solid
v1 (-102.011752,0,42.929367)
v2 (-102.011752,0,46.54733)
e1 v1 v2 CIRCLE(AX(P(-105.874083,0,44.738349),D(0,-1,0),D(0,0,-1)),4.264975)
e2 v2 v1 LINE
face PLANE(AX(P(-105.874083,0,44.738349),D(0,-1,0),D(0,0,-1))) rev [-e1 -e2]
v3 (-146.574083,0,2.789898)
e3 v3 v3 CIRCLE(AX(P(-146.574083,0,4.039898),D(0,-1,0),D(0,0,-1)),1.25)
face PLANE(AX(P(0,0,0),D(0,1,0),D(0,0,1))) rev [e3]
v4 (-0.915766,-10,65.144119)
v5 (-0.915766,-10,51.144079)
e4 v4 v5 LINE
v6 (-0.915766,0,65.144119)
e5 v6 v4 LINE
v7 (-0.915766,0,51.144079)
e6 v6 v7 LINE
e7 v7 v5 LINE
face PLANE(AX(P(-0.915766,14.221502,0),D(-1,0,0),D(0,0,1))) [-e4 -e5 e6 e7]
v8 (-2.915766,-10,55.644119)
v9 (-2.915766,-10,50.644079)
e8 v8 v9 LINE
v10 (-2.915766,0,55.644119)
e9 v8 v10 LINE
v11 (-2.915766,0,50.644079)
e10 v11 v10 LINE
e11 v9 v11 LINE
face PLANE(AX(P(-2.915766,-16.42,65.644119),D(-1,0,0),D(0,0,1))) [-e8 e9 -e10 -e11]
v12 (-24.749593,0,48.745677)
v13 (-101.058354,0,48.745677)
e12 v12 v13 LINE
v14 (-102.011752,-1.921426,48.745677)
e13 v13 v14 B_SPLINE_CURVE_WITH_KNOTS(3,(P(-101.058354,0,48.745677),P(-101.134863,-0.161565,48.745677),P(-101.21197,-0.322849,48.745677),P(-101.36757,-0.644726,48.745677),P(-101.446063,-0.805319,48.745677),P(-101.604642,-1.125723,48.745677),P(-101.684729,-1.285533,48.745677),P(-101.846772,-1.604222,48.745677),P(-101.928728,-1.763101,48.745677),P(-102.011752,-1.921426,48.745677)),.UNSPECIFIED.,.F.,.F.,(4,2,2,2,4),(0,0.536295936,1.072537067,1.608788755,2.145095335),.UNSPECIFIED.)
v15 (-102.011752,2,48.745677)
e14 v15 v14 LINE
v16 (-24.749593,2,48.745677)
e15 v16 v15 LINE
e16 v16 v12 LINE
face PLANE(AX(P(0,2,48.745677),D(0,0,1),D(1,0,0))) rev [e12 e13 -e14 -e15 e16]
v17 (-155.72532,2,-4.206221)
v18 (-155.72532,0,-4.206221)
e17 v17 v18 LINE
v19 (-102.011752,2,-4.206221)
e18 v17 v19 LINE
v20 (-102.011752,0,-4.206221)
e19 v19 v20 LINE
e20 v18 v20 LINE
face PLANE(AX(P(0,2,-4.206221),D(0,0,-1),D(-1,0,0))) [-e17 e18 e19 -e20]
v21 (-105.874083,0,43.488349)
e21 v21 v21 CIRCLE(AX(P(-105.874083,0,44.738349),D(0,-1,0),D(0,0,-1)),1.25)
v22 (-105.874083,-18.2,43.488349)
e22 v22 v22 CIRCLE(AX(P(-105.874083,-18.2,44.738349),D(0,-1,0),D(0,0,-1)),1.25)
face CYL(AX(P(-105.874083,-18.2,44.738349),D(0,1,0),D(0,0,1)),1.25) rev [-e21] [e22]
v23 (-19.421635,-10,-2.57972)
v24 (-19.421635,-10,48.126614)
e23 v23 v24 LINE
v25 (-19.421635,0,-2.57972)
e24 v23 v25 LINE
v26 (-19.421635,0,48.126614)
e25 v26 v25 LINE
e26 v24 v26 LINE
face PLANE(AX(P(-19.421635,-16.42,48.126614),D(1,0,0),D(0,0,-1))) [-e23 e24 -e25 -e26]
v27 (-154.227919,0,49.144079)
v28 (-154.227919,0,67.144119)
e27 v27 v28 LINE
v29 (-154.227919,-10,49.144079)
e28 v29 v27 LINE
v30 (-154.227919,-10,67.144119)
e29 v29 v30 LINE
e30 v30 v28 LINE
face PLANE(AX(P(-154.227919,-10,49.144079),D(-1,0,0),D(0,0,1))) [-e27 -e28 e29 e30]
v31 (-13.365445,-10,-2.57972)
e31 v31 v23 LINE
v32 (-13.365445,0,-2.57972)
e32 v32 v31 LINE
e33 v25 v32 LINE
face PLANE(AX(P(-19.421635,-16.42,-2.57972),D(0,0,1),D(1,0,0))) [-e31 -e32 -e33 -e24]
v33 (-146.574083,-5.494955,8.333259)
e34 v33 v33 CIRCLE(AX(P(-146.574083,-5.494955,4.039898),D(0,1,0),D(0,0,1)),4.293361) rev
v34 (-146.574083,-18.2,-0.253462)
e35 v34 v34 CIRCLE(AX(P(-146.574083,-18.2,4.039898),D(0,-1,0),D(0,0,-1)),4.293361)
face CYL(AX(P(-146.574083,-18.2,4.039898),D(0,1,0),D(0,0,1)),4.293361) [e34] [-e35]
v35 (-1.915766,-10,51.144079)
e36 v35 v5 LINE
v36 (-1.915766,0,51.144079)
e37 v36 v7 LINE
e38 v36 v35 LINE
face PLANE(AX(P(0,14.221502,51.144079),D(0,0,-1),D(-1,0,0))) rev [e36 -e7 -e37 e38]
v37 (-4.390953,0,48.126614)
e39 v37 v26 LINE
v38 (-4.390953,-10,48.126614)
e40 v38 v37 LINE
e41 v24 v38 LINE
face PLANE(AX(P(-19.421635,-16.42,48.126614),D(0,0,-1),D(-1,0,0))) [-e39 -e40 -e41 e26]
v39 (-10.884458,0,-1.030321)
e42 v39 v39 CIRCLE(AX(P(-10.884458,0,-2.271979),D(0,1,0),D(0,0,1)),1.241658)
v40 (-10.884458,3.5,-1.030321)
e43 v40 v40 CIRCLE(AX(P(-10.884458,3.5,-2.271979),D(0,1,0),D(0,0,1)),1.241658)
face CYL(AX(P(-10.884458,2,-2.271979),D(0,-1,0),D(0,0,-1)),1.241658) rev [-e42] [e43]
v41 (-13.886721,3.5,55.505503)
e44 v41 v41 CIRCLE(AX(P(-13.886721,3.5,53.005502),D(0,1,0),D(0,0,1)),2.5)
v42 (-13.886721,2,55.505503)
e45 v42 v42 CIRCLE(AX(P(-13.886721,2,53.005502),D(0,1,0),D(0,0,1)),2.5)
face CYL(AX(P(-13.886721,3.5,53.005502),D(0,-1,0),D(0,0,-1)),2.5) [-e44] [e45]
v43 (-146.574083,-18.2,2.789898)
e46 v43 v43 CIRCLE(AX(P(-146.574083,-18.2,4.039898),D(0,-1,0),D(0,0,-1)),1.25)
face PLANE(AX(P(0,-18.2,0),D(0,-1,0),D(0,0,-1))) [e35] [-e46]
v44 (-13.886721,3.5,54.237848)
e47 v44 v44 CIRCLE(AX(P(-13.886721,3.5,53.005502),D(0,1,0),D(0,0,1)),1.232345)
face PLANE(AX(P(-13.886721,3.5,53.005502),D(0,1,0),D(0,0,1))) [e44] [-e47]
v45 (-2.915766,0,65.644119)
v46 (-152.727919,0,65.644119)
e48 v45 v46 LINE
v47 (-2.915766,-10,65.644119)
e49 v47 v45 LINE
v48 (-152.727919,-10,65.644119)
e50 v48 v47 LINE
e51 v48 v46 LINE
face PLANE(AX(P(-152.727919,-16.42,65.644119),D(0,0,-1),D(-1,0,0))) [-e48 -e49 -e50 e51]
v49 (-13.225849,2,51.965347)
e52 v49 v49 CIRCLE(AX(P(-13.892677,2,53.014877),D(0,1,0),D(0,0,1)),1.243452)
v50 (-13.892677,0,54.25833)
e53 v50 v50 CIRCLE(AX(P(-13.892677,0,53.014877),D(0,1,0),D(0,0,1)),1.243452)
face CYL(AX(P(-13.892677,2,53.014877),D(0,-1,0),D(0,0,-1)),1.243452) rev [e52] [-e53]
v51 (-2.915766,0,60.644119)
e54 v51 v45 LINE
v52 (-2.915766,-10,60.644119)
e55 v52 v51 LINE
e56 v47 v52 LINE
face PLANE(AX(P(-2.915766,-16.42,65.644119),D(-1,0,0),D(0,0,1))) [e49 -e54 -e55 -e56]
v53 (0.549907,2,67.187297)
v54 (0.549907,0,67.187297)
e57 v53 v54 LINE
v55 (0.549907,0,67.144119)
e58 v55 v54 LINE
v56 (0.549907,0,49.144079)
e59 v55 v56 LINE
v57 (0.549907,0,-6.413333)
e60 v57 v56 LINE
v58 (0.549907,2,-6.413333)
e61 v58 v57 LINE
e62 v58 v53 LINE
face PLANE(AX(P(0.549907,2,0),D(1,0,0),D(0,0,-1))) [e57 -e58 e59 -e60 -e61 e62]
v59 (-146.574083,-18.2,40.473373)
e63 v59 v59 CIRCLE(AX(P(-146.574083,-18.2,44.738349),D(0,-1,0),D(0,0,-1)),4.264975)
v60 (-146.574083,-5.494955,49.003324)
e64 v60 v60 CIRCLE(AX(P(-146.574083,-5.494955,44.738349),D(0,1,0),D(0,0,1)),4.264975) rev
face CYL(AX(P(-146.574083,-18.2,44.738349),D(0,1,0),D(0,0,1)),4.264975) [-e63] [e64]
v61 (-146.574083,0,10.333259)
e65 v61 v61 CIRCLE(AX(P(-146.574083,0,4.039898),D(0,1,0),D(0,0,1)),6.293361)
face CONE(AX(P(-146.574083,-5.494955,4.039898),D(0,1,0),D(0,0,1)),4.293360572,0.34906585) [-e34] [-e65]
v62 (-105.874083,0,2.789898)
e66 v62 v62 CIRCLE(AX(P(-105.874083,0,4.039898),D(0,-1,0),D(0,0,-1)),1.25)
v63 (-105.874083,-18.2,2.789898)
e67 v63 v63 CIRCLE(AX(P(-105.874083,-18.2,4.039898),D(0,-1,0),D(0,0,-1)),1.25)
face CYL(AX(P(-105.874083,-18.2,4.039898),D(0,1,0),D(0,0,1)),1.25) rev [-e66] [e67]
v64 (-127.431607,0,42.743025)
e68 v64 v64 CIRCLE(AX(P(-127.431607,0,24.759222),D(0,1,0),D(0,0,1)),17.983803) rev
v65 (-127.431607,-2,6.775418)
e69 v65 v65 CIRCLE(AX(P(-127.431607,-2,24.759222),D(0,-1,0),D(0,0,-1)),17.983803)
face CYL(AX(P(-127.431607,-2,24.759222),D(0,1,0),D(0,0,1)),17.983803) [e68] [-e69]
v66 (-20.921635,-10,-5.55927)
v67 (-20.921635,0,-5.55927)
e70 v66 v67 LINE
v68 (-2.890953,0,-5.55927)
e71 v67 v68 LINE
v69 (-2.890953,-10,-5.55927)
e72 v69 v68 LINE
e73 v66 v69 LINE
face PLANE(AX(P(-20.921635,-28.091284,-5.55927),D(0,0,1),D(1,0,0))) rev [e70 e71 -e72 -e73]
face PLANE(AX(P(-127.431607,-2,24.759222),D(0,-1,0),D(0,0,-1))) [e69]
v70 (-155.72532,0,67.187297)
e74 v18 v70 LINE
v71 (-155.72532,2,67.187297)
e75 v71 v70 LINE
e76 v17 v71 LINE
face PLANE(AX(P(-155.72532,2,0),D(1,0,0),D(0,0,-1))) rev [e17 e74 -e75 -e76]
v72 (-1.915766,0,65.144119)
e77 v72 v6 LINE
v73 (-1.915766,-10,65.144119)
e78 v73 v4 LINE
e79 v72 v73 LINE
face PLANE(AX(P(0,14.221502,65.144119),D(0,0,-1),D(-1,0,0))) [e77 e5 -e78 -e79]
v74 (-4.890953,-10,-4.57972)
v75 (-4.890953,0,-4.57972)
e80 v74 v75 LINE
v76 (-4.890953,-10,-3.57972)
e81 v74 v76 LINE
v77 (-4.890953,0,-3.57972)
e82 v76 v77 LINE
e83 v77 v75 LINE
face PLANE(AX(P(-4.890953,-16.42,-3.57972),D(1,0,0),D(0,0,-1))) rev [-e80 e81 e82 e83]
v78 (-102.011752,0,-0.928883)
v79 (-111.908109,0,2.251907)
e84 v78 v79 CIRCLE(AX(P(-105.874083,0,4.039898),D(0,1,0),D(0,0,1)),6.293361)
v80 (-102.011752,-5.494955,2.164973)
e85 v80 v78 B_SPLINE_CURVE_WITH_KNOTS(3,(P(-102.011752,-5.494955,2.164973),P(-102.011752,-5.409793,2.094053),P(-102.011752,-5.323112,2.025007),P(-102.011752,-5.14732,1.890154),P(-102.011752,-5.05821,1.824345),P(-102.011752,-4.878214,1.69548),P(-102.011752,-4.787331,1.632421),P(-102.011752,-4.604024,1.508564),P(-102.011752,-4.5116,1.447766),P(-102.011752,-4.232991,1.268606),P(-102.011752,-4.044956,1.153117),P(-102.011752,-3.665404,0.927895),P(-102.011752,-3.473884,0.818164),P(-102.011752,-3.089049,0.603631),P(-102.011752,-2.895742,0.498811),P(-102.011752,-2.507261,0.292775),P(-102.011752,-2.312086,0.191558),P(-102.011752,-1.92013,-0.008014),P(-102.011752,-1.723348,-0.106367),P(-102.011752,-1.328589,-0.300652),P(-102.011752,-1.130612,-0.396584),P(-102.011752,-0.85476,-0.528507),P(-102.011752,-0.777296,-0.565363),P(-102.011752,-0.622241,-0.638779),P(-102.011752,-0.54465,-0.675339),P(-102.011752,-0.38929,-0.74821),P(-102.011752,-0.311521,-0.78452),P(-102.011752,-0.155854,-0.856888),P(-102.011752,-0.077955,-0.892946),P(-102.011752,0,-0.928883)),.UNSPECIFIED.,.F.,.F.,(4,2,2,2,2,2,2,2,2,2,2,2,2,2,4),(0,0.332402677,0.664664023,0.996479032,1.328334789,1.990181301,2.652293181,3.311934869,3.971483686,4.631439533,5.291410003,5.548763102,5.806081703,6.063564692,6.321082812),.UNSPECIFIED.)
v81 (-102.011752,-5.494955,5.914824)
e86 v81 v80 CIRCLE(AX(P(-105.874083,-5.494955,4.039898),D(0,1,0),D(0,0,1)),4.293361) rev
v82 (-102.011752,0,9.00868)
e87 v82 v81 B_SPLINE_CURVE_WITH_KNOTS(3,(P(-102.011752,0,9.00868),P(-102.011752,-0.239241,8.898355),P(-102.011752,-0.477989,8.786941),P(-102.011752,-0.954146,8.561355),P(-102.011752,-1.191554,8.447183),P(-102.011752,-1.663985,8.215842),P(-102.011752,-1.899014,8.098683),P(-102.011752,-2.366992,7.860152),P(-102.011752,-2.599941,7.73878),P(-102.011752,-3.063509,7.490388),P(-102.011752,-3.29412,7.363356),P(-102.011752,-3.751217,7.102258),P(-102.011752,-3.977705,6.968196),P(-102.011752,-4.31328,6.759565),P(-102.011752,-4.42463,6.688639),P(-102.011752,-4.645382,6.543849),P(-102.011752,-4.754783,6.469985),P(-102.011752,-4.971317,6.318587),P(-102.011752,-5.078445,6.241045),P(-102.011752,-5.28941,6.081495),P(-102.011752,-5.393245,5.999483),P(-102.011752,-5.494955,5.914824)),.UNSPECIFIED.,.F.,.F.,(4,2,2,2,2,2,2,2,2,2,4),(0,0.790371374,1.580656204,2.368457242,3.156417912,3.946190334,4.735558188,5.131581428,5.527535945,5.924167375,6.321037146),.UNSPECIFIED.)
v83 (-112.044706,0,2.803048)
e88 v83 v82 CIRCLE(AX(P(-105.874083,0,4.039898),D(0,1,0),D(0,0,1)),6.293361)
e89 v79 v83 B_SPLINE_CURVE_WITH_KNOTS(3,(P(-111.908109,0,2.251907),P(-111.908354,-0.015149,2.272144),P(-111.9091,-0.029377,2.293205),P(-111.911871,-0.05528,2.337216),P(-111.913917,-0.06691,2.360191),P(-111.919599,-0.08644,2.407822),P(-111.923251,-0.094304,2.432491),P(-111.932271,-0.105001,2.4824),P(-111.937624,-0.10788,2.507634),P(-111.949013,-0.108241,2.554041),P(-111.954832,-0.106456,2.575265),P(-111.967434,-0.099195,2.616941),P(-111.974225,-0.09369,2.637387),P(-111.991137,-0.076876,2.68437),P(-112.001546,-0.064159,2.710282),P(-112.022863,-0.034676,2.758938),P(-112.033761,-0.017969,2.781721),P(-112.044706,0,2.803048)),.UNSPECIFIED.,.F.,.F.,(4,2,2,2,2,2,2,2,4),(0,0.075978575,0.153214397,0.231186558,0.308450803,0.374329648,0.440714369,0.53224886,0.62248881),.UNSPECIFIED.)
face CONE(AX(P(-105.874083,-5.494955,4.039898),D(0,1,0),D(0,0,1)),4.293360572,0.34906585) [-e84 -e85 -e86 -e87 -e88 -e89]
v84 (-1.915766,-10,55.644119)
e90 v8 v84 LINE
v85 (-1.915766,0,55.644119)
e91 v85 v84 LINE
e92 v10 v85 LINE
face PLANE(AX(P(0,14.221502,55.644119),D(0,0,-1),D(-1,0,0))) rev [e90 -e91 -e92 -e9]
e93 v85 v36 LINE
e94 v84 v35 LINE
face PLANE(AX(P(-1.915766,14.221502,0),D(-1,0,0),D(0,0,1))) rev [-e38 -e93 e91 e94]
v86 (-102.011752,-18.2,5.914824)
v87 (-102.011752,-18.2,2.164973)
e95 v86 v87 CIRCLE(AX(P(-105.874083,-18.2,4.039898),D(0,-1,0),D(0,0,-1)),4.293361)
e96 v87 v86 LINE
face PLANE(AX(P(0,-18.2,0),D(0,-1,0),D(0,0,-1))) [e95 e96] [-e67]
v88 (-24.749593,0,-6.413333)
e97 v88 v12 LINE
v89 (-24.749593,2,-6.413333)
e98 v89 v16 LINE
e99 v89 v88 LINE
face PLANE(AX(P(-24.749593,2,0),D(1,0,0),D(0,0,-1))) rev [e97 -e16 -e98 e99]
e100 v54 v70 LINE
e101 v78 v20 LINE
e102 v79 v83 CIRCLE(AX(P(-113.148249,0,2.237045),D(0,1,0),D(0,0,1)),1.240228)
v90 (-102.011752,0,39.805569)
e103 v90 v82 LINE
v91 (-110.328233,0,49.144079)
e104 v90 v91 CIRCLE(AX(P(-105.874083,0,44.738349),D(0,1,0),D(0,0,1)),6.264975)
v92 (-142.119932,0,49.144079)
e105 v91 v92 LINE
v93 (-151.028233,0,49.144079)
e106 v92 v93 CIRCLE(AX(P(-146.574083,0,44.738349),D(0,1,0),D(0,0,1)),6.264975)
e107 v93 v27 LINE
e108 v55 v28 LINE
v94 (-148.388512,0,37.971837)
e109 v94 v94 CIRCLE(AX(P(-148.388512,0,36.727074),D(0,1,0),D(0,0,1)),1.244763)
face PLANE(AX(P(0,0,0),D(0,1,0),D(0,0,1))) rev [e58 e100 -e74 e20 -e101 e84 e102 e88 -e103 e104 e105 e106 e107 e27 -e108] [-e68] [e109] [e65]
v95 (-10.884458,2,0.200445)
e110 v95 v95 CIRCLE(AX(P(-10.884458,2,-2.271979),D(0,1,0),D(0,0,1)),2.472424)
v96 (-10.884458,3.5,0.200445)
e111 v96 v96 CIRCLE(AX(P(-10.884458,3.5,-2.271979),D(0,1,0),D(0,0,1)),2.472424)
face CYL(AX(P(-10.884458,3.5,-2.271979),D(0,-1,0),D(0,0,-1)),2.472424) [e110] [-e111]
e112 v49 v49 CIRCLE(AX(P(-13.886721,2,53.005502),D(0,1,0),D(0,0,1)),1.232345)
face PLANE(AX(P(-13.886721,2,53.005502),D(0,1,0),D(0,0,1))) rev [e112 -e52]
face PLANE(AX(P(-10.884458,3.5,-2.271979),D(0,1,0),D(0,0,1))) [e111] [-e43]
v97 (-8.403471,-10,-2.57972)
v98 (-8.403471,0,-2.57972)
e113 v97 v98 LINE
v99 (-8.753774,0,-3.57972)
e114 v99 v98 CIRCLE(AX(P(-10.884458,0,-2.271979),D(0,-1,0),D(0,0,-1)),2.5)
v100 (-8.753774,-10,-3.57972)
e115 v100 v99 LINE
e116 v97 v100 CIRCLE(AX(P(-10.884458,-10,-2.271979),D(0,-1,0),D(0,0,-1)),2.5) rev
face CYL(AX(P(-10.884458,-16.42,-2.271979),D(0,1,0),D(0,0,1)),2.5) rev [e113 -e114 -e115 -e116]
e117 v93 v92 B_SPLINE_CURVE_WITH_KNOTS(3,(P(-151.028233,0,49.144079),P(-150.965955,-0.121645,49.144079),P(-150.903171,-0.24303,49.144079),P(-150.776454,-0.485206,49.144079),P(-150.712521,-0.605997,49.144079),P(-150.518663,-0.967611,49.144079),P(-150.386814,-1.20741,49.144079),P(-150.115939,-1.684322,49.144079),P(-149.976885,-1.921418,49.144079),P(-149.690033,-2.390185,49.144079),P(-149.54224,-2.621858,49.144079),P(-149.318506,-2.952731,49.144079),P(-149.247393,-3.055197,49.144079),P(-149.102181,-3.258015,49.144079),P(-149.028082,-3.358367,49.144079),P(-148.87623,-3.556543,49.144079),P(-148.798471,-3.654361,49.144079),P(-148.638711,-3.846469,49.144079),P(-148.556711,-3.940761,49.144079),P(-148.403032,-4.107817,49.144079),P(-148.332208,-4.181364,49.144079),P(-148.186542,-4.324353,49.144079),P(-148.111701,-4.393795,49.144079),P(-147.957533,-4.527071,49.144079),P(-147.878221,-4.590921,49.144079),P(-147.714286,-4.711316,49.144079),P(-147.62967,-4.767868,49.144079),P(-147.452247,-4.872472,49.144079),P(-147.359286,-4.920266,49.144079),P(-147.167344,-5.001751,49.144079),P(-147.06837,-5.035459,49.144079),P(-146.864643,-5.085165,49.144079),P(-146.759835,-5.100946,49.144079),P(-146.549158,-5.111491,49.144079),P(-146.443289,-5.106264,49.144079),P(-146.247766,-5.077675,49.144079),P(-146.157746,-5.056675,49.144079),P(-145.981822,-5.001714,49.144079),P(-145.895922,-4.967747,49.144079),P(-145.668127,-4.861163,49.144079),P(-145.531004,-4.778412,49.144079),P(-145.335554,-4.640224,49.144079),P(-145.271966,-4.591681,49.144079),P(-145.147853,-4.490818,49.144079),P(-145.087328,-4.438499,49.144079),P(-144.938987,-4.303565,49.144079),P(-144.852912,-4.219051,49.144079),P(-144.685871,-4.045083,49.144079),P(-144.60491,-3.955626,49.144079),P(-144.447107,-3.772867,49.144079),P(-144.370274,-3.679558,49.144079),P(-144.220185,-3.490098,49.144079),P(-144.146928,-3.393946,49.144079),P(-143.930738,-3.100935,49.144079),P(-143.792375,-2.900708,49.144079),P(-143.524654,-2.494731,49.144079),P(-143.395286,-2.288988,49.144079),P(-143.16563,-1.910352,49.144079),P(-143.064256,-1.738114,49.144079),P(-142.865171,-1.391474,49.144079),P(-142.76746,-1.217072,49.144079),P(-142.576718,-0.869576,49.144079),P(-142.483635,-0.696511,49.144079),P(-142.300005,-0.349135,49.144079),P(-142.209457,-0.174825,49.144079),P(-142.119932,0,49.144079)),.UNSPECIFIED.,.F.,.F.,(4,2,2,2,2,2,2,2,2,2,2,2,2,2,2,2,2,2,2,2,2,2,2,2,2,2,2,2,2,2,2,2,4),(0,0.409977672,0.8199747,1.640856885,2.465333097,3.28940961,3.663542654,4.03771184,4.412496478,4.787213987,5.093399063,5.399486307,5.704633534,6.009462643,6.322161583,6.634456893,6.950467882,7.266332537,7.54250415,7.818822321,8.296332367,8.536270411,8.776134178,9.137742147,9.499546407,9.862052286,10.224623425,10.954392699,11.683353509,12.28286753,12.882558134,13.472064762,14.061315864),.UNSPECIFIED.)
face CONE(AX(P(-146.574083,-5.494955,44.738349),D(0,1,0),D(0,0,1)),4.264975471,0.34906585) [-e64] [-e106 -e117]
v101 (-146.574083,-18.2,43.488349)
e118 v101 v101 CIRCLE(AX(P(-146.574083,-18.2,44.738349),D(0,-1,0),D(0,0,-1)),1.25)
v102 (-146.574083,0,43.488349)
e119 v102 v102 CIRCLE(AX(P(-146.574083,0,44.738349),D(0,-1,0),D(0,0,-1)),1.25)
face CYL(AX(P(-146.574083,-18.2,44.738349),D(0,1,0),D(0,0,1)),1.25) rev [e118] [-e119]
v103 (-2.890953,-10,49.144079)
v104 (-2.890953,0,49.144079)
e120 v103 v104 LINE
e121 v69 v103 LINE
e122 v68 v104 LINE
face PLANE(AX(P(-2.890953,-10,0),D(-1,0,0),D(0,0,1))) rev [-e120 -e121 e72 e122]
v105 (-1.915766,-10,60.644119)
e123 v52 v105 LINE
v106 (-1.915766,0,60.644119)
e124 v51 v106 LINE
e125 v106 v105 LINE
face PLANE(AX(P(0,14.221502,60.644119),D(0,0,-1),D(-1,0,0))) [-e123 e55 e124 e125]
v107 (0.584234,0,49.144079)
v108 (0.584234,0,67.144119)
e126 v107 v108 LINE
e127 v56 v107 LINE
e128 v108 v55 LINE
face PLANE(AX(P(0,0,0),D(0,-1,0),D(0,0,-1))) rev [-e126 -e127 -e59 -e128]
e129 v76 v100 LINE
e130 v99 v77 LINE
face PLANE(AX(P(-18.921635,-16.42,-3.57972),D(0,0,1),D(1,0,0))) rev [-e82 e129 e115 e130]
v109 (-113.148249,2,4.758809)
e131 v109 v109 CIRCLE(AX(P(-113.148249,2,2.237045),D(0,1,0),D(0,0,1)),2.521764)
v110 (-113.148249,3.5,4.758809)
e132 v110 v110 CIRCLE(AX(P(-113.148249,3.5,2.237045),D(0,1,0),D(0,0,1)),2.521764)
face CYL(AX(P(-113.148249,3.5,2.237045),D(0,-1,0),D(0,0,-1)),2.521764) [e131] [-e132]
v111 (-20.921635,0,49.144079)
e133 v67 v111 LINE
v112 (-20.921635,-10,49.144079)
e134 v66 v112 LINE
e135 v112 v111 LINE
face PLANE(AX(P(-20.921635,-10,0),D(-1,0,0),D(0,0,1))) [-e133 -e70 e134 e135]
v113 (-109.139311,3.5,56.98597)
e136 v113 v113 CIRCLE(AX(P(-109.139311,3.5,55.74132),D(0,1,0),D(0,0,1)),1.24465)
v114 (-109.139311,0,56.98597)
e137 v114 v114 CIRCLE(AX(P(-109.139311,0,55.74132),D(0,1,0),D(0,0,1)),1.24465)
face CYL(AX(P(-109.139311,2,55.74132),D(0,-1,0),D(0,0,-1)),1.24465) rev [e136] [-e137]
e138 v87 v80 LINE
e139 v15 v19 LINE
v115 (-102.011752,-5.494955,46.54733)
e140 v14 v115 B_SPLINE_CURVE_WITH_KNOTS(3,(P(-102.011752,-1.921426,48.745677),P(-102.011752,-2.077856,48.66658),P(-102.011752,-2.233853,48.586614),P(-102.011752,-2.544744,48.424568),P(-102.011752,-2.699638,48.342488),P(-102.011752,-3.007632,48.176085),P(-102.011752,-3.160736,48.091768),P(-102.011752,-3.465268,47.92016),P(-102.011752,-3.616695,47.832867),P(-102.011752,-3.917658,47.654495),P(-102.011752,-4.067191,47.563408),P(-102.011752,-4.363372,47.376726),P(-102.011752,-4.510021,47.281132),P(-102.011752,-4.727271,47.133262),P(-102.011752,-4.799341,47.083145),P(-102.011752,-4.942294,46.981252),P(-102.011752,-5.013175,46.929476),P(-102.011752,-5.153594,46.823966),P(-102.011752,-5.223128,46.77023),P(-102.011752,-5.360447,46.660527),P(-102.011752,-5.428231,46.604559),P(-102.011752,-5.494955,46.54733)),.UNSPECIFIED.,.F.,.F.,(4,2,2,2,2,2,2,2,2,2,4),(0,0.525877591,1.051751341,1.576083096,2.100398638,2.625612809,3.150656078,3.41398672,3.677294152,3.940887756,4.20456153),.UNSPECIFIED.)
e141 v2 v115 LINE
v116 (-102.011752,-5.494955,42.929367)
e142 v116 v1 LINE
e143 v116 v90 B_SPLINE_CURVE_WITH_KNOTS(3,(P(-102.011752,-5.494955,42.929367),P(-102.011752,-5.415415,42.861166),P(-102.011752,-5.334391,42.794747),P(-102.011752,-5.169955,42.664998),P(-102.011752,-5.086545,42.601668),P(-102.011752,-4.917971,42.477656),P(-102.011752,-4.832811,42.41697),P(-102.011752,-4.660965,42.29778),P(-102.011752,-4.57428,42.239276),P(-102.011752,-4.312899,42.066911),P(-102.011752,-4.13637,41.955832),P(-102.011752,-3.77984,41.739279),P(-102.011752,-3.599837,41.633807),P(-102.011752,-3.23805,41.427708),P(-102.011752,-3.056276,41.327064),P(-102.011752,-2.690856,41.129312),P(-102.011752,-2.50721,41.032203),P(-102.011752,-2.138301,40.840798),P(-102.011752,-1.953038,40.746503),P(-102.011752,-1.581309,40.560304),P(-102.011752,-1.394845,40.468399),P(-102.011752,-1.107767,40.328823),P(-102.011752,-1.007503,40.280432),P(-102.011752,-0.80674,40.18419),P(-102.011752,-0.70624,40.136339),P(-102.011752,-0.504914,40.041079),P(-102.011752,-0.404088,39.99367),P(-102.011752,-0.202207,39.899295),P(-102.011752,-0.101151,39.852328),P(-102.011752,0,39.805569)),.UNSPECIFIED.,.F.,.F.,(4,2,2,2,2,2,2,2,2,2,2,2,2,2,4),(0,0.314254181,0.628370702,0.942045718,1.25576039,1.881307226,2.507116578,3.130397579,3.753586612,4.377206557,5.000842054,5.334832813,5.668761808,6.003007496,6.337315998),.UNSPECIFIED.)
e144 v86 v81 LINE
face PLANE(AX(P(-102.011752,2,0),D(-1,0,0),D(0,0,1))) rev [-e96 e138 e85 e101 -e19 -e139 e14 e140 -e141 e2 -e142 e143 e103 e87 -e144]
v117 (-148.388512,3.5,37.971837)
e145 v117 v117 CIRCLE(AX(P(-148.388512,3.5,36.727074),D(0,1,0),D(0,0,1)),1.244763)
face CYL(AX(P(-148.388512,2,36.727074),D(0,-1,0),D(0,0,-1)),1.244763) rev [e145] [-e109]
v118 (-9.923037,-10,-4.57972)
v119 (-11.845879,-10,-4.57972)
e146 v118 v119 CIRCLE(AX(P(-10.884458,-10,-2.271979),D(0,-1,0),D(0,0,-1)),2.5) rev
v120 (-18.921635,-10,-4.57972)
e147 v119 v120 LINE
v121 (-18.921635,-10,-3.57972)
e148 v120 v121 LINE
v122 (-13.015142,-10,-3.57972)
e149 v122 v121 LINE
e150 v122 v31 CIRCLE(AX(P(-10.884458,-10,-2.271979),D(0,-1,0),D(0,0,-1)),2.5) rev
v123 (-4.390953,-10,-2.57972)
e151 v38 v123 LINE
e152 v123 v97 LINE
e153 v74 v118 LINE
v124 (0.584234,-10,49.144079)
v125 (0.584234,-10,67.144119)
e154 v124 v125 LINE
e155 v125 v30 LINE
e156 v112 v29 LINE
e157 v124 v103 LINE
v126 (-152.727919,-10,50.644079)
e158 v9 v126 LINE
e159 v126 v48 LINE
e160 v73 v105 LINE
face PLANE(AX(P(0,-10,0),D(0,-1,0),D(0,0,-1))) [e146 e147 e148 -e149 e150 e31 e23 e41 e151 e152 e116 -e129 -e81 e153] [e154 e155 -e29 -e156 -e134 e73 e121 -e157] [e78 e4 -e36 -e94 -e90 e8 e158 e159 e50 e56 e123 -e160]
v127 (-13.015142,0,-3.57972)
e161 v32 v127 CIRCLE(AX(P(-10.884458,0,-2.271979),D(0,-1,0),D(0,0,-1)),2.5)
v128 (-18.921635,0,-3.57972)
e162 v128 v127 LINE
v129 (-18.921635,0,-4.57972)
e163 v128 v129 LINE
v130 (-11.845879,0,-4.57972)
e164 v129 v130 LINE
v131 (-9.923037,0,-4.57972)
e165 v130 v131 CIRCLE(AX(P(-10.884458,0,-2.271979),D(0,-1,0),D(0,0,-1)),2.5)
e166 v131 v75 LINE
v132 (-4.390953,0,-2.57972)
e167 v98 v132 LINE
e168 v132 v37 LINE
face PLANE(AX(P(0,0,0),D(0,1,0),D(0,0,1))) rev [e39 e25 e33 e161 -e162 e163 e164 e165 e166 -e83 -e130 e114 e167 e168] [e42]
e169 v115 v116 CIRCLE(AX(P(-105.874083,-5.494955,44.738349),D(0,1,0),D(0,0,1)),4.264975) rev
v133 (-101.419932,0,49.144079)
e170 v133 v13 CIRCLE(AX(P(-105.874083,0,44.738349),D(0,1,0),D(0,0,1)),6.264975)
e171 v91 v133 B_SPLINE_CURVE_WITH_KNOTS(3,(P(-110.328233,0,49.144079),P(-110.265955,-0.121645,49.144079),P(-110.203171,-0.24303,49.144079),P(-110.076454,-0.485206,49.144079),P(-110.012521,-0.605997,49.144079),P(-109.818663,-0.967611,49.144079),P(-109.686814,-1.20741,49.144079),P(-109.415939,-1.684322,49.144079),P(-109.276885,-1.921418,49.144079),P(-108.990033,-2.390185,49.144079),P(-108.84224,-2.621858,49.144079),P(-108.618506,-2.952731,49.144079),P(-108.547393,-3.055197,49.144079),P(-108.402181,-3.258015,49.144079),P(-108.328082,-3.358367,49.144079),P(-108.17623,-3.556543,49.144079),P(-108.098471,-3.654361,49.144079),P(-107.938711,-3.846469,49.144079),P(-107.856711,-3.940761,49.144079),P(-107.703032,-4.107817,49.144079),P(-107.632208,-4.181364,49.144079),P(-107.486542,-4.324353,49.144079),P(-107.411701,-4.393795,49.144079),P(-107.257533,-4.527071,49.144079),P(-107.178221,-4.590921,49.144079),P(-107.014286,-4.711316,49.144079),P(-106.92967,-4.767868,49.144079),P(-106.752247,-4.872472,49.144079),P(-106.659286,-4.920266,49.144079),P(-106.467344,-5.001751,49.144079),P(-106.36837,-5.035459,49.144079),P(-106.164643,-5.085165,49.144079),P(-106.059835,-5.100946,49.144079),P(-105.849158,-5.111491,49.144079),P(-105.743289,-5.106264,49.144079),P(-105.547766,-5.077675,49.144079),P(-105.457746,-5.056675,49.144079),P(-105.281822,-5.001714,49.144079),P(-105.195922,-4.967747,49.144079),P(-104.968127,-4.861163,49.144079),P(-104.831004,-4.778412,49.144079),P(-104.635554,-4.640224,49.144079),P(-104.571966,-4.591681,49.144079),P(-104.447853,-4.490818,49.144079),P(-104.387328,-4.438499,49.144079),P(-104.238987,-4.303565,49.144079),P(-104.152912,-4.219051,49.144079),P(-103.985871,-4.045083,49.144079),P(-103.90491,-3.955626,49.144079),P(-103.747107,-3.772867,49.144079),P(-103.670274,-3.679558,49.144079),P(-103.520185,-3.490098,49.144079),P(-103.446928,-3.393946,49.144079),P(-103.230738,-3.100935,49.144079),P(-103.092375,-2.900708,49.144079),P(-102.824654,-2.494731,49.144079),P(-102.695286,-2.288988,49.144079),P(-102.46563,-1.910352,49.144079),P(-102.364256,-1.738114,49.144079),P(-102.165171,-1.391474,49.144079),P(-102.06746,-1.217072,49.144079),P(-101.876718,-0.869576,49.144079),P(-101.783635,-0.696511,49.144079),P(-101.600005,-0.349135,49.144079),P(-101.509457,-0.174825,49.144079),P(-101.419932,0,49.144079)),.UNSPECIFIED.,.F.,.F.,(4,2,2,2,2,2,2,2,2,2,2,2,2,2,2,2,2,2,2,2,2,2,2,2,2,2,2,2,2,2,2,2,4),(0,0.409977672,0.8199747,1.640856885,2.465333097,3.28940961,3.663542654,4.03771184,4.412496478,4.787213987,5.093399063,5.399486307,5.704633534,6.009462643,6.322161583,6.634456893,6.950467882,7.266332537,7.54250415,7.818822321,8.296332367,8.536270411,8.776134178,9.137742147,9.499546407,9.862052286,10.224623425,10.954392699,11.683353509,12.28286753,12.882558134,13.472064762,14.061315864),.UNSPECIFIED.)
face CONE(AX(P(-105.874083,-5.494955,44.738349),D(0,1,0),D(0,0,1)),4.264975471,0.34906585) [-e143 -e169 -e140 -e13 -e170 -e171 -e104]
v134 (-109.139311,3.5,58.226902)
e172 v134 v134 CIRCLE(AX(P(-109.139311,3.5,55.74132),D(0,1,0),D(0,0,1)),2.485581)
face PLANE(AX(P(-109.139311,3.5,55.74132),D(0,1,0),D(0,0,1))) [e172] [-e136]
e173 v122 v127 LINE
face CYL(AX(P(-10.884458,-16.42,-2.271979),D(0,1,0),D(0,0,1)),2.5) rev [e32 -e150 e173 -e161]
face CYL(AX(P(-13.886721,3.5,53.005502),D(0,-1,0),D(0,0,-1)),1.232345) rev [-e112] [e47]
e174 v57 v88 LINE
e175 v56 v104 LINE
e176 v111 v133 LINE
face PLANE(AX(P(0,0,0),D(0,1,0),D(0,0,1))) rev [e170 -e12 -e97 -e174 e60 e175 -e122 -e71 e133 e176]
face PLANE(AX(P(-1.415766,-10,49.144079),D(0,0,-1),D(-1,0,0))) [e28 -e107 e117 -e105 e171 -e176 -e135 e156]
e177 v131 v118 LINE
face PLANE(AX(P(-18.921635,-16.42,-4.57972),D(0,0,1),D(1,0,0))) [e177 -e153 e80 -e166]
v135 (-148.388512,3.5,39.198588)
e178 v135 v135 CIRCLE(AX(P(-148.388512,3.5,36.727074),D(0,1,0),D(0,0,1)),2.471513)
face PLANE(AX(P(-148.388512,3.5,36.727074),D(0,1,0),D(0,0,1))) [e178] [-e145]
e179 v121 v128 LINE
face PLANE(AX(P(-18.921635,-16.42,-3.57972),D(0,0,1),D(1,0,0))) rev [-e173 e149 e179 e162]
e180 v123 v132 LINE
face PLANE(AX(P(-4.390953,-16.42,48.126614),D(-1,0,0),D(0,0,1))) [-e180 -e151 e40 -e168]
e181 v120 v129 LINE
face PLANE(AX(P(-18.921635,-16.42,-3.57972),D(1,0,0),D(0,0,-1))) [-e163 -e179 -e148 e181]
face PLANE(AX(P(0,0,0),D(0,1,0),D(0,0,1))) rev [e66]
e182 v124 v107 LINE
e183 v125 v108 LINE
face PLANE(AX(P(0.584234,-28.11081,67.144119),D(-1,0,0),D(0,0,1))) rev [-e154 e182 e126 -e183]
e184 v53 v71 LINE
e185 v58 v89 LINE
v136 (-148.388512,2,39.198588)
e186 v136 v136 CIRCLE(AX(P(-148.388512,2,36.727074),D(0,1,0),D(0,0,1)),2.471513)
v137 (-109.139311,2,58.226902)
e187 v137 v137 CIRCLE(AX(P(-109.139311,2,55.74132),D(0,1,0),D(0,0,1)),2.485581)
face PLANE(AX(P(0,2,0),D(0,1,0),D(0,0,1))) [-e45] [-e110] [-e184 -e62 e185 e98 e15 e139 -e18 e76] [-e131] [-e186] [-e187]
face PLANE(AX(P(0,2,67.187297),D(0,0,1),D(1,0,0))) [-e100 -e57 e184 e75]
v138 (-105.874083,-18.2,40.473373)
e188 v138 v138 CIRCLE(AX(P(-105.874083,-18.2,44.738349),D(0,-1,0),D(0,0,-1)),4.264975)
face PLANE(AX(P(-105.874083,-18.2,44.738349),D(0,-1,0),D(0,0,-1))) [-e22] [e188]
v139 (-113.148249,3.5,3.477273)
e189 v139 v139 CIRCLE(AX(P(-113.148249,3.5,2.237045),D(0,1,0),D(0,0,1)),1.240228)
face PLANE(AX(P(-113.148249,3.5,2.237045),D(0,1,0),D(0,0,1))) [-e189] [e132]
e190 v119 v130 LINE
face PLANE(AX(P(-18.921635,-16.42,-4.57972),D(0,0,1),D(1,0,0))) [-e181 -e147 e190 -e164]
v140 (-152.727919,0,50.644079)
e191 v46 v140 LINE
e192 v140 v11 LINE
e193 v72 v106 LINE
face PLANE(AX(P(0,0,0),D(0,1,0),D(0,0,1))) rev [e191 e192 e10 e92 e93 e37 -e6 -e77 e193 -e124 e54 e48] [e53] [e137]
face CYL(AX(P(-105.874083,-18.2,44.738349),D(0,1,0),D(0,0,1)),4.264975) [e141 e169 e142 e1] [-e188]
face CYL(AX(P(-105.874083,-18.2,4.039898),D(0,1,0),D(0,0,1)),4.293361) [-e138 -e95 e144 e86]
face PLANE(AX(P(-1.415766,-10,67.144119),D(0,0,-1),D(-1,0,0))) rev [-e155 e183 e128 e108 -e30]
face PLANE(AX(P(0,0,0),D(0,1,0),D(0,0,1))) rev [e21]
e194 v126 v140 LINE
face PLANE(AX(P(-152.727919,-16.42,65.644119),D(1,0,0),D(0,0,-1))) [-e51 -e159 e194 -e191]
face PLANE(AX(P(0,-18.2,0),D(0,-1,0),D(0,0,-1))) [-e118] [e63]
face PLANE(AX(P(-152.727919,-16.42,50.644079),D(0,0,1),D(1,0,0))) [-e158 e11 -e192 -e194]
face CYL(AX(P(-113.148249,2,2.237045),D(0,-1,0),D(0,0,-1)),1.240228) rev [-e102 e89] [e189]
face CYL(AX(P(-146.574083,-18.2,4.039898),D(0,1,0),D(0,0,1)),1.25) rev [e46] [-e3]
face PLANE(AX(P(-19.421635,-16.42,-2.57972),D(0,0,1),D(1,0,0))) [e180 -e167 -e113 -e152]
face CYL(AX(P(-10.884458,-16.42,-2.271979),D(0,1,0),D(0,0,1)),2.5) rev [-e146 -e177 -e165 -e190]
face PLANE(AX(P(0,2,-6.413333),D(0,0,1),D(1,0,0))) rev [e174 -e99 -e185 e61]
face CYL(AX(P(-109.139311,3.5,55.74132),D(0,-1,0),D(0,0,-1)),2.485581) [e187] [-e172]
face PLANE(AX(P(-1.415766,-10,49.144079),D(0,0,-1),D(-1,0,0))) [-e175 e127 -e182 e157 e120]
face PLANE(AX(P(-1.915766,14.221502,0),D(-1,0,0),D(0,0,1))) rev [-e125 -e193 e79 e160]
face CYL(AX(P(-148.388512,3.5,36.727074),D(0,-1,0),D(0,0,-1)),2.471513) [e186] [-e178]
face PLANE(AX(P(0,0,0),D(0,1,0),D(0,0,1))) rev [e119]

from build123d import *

# Parameters (mm, degrees)
SKETCH1_W                 = 25.299499494
SKETCH1_H                 = 55.159009877
SKETCH1_R                 = 1.241657959
SKETCH1_R_2               = 1.244649804
SKETCH1_R_3               = 1.243452392
SKETCH1_W_2               = 53.713568487
SKETCH1_H_2               = 52.951897156
SKETCH1_R_4               = 1.244762628
SKETCH1_R_5               = 1.240228495
BOSS_EXTRUDE1_DEPTH       = 2
SKETCH2_R                 = 2.521764251
SKETCH2_R_2               = 1.240228495
SKETCH2_R_3               = 2.471513498
SKETCH2_R_4               = 1.244762628
SKETCH2_R_5               = 2.485581318
SKETCH2_R_6               = 1.244649804
SKETCH2_R_7               = 2.50000008
SKETCH2_R_8               = 1.232345201
SKETCH2_R_9               = 2.472424153
SKETCH2_R_10              = 1.241657959
BOSS_EXTRUDE2_DEPTH       = 1.5
BOSS_EXTRUDE3_OUTLINE_R   = 4.264975471
BOSS_EXTRUDE3_OUTLINE_R_2 = 1.25
BOSS_EXTRUDE3_OUTLINE_R_3 = 4.293360572
BOSS_EXTRUDE3_DEPTH       = 18.2
BOSS_EXTRUDE4_OUTLINE_W   = 148.81215391
BOSS_EXTRUDE4_OUTLINE_H   = 14.000040224
BOSS_EXTRUDE4_DEPTH       = 10
SKETCH7_W                 = 18.030681689
SKETCH7_H                 = 1.47954917
BOSS_EXTRUDE5_DEPTH       = 10
SKETCH8_R                 = 2.5
SKETCH8_W                 = 14.030681689
SKETCH8_H                 = 1
CUT_EXTRUDE1_DEPTH        = 16.42
SKETCH9_W                 = 2
SKETCH9_H                 = 18.000040224
BOSS_EXTRUDE6_DEPTH       = 10
SKETCH10_W                = 1
SKETCH10_H                = 14.000040224
SKETCH10_W_2              = 1.5
SKETCH10_H_2              = 5
CUT_EXTRUDE2_DEPTH        = 10
CHAMFER1_SIZE             = 2
CHAMFER1_SIZE_2           = 5.494954839
SKETCH12_W                = 15.030681689
SKETCH12_H                = 50.706334577
SKETCH12_W_2              = 14.030681689
SKETCH12_H_2              = 49.706334577
SKETCH12_W_3              = 149.81215391
SKETCH12_H_3              = 15.000040224
SKETCH12_W_4              = 148.81215391
SKETCH12_H_4              = 14.000040224
CUT_EXTRUDE3_DEPTH        = 16.42
SKETCH13_R                = 17.983803221
BOSS_EXTRUDE7_DEPTH       = 2


# Read off the part's stored shape, not the designer's step: Boss-Extrude3, Boss-Extrude4
with BuildPart() as part:
    # Sketch1 → Boss-Extrude1 (new body)
    # profile 1 of 3: a face of its own
    with BuildSketch(Plane(origin=(0, 0, 0), x_dir=(1, 0, 0), z_dir=(0, 1, 0))):
        with Locations((-12.099843009, -21.166171701)):
            Rectangle(SKETCH1_W, SKETCH1_H)
        with Locations(Location((-10.884458073, 2.271979315, 0), (0, 0, 270))):
            Circle(SKETCH1_R, mode=Mode.SUBTRACT)
    # profile 2 of 3: a face of its own
    with BuildSketch(Plane(origin=(0, 0, 0), x_dir=(1, 0, 0), z_dir=(0, 1, 0))):
        Polygon((0.549906738, -67.187297417), (0.549906738, -48.745676639), (-24.749592756, -48.745676639), (-102.011751733, -48.745676639), (-155.72532022, -48.745676639), (-155.72532022, -67.187297417), align=None)
        with Locations(Location((-109.139310681, -55.741320352, 0), (0, 0, 270))):
            Circle(SKETCH1_R_2, mode=Mode.SUBTRACT)
        with Locations(Location((-13.892677204, -53.014877456, 0), (0, 0, 270))):
            Circle(SKETCH1_R_3, mode=Mode.SUBTRACT)
    # profile 3 of 3: a face of its own
    with BuildSketch(Plane(origin=(0, 0, 0), x_dir=(1, 0, 0), z_dir=(0, 1, 0))):
        with Locations((-128.868535977, -22.269728061)):
            Rectangle(SKETCH1_W_2, SKETCH1_H_2)
        with Locations(Location((-148.388511799, -36.727074265, 0), (0, 0, 270))):
            Circle(SKETCH1_R_4, mode=Mode.SUBTRACT)
        with Locations(Location((-113.148248588, -2.237044718, 0), (0, 0, 270))):
            Circle(SKETCH1_R_5, mode=Mode.SUBTRACT)
    extrude(amount=BOSS_EXTRUDE1_DEPTH)

    # Sketch2 → Boss-Extrude2 (add)
    # profile 1 of 5: a face of its own
    with BuildSketch(Plane(origin=(0, 2, 0), x_dir=(1, 0, 0), z_dir=(0, 1, 0))):
        with Locations(Location((-113.148248588, -2.237044718, 0), (0, 0, 270))):
            Circle(SKETCH2_R)
        with Locations(Location((-113.148248588, -2.237044718, 0), (0, 0, 270))):
            Circle(SKETCH2_R_2, mode=Mode.SUBTRACT)
    # profile 2 of 5: a face of its own
    with BuildSketch(Plane(origin=(0, 2, 0), x_dir=(1, 0, 0), z_dir=(0, 1, 0))):
        with Locations(Location((-148.388511799, -36.727074265, 0), (0, 0, 270))):
            Circle(SKETCH2_R_3)
        with Locations(Location((-148.388511799, -36.727074265, 0), (0, 0, 270))):
            Circle(SKETCH2_R_4, mode=Mode.SUBTRACT)
    # profile 3 of 5: a face of its own
    with BuildSketch(Plane(origin=(0, 2, 0), x_dir=(1, 0, 0), z_dir=(0, 1, 0))):
        with Locations(Location((-109.139310681, -55.741320352, 0), (0, 0, 270))):
            Circle(SKETCH2_R_5)
        with Locations(Location((-109.139310681, -55.741320352, 0), (0, 0, 270))):
            Circle(SKETCH2_R_6, mode=Mode.SUBTRACT)
    # profile 4 of 5: a face of its own
    with BuildSketch(Plane(origin=(0, 2, 0), x_dir=(1, 0, 0), z_dir=(0, 1, 0))):
        with Locations(Location((-13.886720738, -53.00550248, 0), (0, 0, 270))):
            Circle(SKETCH2_R_7)
        with Locations(Location((-13.886720738, -53.00550248, 0), (0, 0, 57.569834669))):
            Circle(SKETCH2_R_8, mode=Mode.SUBTRACT)
    # profile 5 of 5: a face of its own
    with BuildSketch(Plane(origin=(0, 2, 0), x_dir=(1, 0, 0), z_dir=(0, 1, 0))):
        with Locations(Location((-10.884458073, 2.271979315, 0), (0, 0, 270))):
            Circle(SKETCH2_R_9)
        with Locations(Location((-10.884458073, 2.271979315, 0), (0, 0, 270))):
            Circle(SKETCH2_R_10, mode=Mode.SUBTRACT)
    extrude(amount=BOSS_EXTRUDE2_DEPTH)

    # Boss-Extrude3 outline → Boss-Extrude3 (add)
    # profile 1 of 4: a face of its own
    with BuildSketch(Plane.XZ):
        with Locations((-105.874082677, 44.738348581)):
            Circle(BOSS_EXTRUDE3_OUTLINE_R)
        with Locations((-105.874082677, 44.738348581)):
            Circle(BOSS_EXTRUDE3_OUTLINE_R_2, mode=Mode.SUBTRACT)
    # profile 2 of 4: a face of its own
    with BuildSketch(Plane.XZ):
        with BuildLine():
            ThreePointArc((-102.011751733, 5.914823562), (-110.167443249, 4.039898313), (-102.011751733, 2.164973064))
            Line((-102.011751733, 2.164973064), (-102.011751733, 5.914823562))
        make_face()
        with Locations((-105.874082677, 4.039898313)):
            Circle(BOSS_EXTRUDE3_OUTLINE_R_2, mode=Mode.SUBTRACT)
    # profile 3 of 4: a face of its own
    with BuildSketch(Plane.XZ):
        with Locations((-146.574082677, 4.039898313)):
            Circle(BOSS_EXTRUDE3_OUTLINE_R_3)
        with Locations((-146.574082677, 4.039898313)):
            Circle(BOSS_EXTRUDE3_OUTLINE_R_2, mode=Mode.SUBTRACT)
    # profile 4 of 4: a face of its own
    with BuildSketch(Plane.XZ):
        with Locations((-146.574082677, 44.738348581)):
            Circle(BOSS_EXTRUDE3_OUTLINE_R)
        with Locations((-146.574082677, 44.738348581)):
            Circle(BOSS_EXTRUDE3_OUTLINE_R_2, mode=Mode.SUBTRACT)
    extrude(amount=BOSS_EXTRUDE3_DEPTH)

    # Boss-Extrude4 outline → Boss-Extrude4 (add)
    with BuildSketch(Plane.XZ):
        Polygon((-2.890953027, -4.07972047), (-2.890953027, 49.144078772), (-1.415765517, 49.144078772), (-1.415765517, 67.144118996), (-154.227919427, 67.144118996), (-154.227919427, 49.144078772), (-20.921634716, 49.144078772), (-20.921634716, -4.07972047), align=None)
        with BuildLine():
            ThreePointArc((-9.657775138, -2.07972047), (-10.884458073, -3.513637274), (-12.111141008, -2.07972047))
            Line((-12.111141008, -2.07972047), (-18.921634716, -2.07972047))
            Line((-18.921634716, -2.07972047), (-18.921634716, 47.626614107))
            Line((-18.921634716, 47.626614107), (-4.890953027, 47.626614107))
            Line((-4.890953027, 47.626614107), (-4.890953027, -2.07972047))
            Line((-4.890953027, -2.07972047), (-9.657775138, -2.07972047))
        make_face(mode=Mode.SUBTRACT)
        with Locations((-77.821842472, 58.144098884)):
            Rectangle(BOSS_EXTRUDE4_OUTLINE_W, BOSS_EXTRUDE4_OUTLINE_H, mode=Mode.SUBTRACT)
    extrude(amount=BOSS_EXTRUDE4_DEPTH)

    # Sketch7 → Boss-Extrude5 (add)
    with BuildSketch(Plane.XZ):
        with Locations((-11.906293872, -4.819495055)):
            Rectangle(SKETCH7_W, SKETCH7_H)
    extrude(amount=BOSS_EXTRUDE5_DEPTH)

    # Sketch8 → Cut-Extrude1 (cut)
    with BuildSketch(Plane.XZ):
        with Locations((-10.884458073, -2.271979315)):
            Circle(SKETCH8_R)
        with Locations((-11.906293872, -4.07972047)):
            Rectangle(SKETCH8_W, SKETCH8_H)
    extrude(amount=CUT_EXTRUDE1_DEPTH, mode=Mode.SUBTRACT)

    # Sketch9 → Boss-Extrude6 (add)
    with BuildSketch(Plane.XZ):
        with Locations((-0.415765517, 58.144098884)):
            Rectangle(SKETCH9_W, SKETCH9_H)
    extrude(amount=BOSS_EXTRUDE6_DEPTH)

    # Sketch10 → Cut-Extrude2 (cut)
    with BuildSketch(Plane.XZ.offset(10)):
        with Locations((-1.415765517, 58.144098884)):
            Rectangle(SKETCH10_W, SKETCH10_H)
        with Locations((-2.665765517, 58.144118996)):
            Rectangle(SKETCH10_W_2, SKETCH10_H_2)
    extrude(amount=-CUT_EXTRUDE2_DEPTH, mode=Mode.SUBTRACT)

    # Chamfer1
    # the kernel refuses this chamfer: 5.494954839, 2 mm, written as the material it adds along each edge
    with BuildSketch(Plane(origin=(-105.874082677, 0, 44.738348581), x_dir=(0.9999950652018582, 0, 0.0031415874859127522), z_dir=(0.0031415874859127522, 0, -0.9999950652018582))) as chamfer1_piece_1_section:
        Polygon((4.264975471 + CHAMFER1_SIZE, 0), (4.264975471, CHAMFER1_SIZE_2), (4.264975471, 0), align=None)
    chamfer1_piece_1 = revolve(axis=Axis((-105.874082677, 0, 44.738348581), (0, -1, 0)), revolution_arc=359.64, mode=Mode.PRIVATE)
    chamfer1_piece_1 = split(chamfer1_piece_1, bisect_by=Plane(origin=(-102.011751733, -2.257712416, 48.069640288), z_dir=(-1, 0, 0)), keep=Keep.TOP, mode=Mode.PRIVATE)
    add(chamfer1_piece_1)
    with BuildSketch(Plane(origin=(-105.874082677, 0, 44.738348581), x_dir=(0.9999950652018582, 0, 0.0031415874859127522), z_dir=(0.0031415874859127522, 0, -0.9999950652018582))) as chamfer1_piece_2_section:
        Polygon((4.264975471 + CHAMFER1_SIZE, 0), (4.264975471, CHAMFER1_SIZE_2), (4.264975471, 0), align=None)
    chamfer1_piece_2 = revolve(axis=Axis((-105.874082677, 0, 44.738348581), (0, -1, 0)), revolution_arc=359.64, mode=Mode.PRIVATE)
    chamfer1_piece_2 = split(chamfer1_piece_2, bisect_by=Plane(origin=(-101.74069423, -0.533251507, 48.745676639), z_dir=(0, 0, 1)), keep=Keep.TOP, mode=Mode.PRIVATE)
    add(chamfer1_piece_2)
    with BuildSketch(Plane(origin=(-105.874082676, 0, 4.039898313), x_dir=(0.9999950652018581, 0, 0.0031415874858793983), z_dir=(0.0031415874858793983, 0, -0.9999950652018581))) as chamfer1_piece_3_section:
        Polygon((4.293360573 + CHAMFER1_SIZE, 0), (4.293360573, CHAMFER1_SIZE_2), (4.293360573, 0), align=None)
    chamfer1_piece_3 = revolve(axis=Axis((-105.874082676, 0, 4.039898313), (0, -1, 0)), revolution_arc=359.64, mode=Mode.PRIVATE)
    chamfer1_piece_3 = split(chamfer1_piece_3, bisect_by=Plane(origin=(-102.011751733, -2.729942782, 4.039898313), z_dir=(-1, 0, 0)), keep=Keep.TOP, mode=Mode.PRIVATE)
    chamfer1_piece_3 = chamfer1_piece_3 - Plane(origin=(-113.148248588, -2.729942782, 2.237044718), x_dir=(0, 0, 1), z_dir=(0, -1, 0)) * Cylinder(1.240228495, 26, mode=Mode.PRIVATE)
    add(chamfer1_piece_3)
    with BuildSketch(Plane(origin=(-146.574082677, 0, 4.039898313), x_dir=(1, 0, 0), z_dir=(0, 0, -1))) as chamfer1_piece_4:
        Polygon((4.293360572 + CHAMFER1_SIZE, 0), (4.293360572, CHAMFER1_SIZE_2), (4.293360572, 0), align=None)
    revolve(axis=Axis((-146.574082677, 0, 4.039898313), (0, -1, 0)))
    with BuildSketch(Plane(origin=(-146.574082677, 0, 44.738348581), x_dir=(1, 0, 0), z_dir=(0, 0, -1))) as chamfer1_piece_5:
        Polygon((4.264975471 + CHAMFER1_SIZE, 0), (4.264975471, CHAMFER1_SIZE_2), (4.264975471, 0), align=None)
    revolve(axis=Axis((-146.574082677, 0, 44.738348581), (0, -1, 0)))

    # Sketch12 → Cut-Extrude3 (cut)
    # profile 1 of 2: a face of its own
    with BuildSketch(Plane.XZ):
        with Locations((-11.906293872, 22.773446819)):
            Rectangle(SKETCH12_W, SKETCH12_H)
        with Locations((-11.906293872, 22.773446819)):
            Rectangle(SKETCH12_W_2, SKETCH12_H_2, mode=Mode.SUBTRACT)
    # profile 2 of 2: a face of its own
    with BuildSketch(Plane.XZ):
        with Locations((-77.821842472, 58.144098884)):
            Rectangle(SKETCH12_W_3, SKETCH12_H_3)
        with Locations((-77.821842472, 58.144098884)):
            Rectangle(SKETCH12_W_4, SKETCH12_H_4, mode=Mode.SUBTRACT)
    extrude(amount=CUT_EXTRUDE3_DEPTH, mode=Mode.SUBTRACT)

    # Sketch13 → Boss-Extrude7 (add)
    with BuildSketch(Plane(origin=(0, 0, 0), x_dir=(-1, 0, 0), z_dir=(0, -1, 0))):
        with Locations(Location((127.431607473, -24.759221512, 0), (0, 0, 270))):
            Circle(SKETCH13_R)
    extrude(amount=BOSS_EXTRUDE7_DEPTH)


solid = part.part
